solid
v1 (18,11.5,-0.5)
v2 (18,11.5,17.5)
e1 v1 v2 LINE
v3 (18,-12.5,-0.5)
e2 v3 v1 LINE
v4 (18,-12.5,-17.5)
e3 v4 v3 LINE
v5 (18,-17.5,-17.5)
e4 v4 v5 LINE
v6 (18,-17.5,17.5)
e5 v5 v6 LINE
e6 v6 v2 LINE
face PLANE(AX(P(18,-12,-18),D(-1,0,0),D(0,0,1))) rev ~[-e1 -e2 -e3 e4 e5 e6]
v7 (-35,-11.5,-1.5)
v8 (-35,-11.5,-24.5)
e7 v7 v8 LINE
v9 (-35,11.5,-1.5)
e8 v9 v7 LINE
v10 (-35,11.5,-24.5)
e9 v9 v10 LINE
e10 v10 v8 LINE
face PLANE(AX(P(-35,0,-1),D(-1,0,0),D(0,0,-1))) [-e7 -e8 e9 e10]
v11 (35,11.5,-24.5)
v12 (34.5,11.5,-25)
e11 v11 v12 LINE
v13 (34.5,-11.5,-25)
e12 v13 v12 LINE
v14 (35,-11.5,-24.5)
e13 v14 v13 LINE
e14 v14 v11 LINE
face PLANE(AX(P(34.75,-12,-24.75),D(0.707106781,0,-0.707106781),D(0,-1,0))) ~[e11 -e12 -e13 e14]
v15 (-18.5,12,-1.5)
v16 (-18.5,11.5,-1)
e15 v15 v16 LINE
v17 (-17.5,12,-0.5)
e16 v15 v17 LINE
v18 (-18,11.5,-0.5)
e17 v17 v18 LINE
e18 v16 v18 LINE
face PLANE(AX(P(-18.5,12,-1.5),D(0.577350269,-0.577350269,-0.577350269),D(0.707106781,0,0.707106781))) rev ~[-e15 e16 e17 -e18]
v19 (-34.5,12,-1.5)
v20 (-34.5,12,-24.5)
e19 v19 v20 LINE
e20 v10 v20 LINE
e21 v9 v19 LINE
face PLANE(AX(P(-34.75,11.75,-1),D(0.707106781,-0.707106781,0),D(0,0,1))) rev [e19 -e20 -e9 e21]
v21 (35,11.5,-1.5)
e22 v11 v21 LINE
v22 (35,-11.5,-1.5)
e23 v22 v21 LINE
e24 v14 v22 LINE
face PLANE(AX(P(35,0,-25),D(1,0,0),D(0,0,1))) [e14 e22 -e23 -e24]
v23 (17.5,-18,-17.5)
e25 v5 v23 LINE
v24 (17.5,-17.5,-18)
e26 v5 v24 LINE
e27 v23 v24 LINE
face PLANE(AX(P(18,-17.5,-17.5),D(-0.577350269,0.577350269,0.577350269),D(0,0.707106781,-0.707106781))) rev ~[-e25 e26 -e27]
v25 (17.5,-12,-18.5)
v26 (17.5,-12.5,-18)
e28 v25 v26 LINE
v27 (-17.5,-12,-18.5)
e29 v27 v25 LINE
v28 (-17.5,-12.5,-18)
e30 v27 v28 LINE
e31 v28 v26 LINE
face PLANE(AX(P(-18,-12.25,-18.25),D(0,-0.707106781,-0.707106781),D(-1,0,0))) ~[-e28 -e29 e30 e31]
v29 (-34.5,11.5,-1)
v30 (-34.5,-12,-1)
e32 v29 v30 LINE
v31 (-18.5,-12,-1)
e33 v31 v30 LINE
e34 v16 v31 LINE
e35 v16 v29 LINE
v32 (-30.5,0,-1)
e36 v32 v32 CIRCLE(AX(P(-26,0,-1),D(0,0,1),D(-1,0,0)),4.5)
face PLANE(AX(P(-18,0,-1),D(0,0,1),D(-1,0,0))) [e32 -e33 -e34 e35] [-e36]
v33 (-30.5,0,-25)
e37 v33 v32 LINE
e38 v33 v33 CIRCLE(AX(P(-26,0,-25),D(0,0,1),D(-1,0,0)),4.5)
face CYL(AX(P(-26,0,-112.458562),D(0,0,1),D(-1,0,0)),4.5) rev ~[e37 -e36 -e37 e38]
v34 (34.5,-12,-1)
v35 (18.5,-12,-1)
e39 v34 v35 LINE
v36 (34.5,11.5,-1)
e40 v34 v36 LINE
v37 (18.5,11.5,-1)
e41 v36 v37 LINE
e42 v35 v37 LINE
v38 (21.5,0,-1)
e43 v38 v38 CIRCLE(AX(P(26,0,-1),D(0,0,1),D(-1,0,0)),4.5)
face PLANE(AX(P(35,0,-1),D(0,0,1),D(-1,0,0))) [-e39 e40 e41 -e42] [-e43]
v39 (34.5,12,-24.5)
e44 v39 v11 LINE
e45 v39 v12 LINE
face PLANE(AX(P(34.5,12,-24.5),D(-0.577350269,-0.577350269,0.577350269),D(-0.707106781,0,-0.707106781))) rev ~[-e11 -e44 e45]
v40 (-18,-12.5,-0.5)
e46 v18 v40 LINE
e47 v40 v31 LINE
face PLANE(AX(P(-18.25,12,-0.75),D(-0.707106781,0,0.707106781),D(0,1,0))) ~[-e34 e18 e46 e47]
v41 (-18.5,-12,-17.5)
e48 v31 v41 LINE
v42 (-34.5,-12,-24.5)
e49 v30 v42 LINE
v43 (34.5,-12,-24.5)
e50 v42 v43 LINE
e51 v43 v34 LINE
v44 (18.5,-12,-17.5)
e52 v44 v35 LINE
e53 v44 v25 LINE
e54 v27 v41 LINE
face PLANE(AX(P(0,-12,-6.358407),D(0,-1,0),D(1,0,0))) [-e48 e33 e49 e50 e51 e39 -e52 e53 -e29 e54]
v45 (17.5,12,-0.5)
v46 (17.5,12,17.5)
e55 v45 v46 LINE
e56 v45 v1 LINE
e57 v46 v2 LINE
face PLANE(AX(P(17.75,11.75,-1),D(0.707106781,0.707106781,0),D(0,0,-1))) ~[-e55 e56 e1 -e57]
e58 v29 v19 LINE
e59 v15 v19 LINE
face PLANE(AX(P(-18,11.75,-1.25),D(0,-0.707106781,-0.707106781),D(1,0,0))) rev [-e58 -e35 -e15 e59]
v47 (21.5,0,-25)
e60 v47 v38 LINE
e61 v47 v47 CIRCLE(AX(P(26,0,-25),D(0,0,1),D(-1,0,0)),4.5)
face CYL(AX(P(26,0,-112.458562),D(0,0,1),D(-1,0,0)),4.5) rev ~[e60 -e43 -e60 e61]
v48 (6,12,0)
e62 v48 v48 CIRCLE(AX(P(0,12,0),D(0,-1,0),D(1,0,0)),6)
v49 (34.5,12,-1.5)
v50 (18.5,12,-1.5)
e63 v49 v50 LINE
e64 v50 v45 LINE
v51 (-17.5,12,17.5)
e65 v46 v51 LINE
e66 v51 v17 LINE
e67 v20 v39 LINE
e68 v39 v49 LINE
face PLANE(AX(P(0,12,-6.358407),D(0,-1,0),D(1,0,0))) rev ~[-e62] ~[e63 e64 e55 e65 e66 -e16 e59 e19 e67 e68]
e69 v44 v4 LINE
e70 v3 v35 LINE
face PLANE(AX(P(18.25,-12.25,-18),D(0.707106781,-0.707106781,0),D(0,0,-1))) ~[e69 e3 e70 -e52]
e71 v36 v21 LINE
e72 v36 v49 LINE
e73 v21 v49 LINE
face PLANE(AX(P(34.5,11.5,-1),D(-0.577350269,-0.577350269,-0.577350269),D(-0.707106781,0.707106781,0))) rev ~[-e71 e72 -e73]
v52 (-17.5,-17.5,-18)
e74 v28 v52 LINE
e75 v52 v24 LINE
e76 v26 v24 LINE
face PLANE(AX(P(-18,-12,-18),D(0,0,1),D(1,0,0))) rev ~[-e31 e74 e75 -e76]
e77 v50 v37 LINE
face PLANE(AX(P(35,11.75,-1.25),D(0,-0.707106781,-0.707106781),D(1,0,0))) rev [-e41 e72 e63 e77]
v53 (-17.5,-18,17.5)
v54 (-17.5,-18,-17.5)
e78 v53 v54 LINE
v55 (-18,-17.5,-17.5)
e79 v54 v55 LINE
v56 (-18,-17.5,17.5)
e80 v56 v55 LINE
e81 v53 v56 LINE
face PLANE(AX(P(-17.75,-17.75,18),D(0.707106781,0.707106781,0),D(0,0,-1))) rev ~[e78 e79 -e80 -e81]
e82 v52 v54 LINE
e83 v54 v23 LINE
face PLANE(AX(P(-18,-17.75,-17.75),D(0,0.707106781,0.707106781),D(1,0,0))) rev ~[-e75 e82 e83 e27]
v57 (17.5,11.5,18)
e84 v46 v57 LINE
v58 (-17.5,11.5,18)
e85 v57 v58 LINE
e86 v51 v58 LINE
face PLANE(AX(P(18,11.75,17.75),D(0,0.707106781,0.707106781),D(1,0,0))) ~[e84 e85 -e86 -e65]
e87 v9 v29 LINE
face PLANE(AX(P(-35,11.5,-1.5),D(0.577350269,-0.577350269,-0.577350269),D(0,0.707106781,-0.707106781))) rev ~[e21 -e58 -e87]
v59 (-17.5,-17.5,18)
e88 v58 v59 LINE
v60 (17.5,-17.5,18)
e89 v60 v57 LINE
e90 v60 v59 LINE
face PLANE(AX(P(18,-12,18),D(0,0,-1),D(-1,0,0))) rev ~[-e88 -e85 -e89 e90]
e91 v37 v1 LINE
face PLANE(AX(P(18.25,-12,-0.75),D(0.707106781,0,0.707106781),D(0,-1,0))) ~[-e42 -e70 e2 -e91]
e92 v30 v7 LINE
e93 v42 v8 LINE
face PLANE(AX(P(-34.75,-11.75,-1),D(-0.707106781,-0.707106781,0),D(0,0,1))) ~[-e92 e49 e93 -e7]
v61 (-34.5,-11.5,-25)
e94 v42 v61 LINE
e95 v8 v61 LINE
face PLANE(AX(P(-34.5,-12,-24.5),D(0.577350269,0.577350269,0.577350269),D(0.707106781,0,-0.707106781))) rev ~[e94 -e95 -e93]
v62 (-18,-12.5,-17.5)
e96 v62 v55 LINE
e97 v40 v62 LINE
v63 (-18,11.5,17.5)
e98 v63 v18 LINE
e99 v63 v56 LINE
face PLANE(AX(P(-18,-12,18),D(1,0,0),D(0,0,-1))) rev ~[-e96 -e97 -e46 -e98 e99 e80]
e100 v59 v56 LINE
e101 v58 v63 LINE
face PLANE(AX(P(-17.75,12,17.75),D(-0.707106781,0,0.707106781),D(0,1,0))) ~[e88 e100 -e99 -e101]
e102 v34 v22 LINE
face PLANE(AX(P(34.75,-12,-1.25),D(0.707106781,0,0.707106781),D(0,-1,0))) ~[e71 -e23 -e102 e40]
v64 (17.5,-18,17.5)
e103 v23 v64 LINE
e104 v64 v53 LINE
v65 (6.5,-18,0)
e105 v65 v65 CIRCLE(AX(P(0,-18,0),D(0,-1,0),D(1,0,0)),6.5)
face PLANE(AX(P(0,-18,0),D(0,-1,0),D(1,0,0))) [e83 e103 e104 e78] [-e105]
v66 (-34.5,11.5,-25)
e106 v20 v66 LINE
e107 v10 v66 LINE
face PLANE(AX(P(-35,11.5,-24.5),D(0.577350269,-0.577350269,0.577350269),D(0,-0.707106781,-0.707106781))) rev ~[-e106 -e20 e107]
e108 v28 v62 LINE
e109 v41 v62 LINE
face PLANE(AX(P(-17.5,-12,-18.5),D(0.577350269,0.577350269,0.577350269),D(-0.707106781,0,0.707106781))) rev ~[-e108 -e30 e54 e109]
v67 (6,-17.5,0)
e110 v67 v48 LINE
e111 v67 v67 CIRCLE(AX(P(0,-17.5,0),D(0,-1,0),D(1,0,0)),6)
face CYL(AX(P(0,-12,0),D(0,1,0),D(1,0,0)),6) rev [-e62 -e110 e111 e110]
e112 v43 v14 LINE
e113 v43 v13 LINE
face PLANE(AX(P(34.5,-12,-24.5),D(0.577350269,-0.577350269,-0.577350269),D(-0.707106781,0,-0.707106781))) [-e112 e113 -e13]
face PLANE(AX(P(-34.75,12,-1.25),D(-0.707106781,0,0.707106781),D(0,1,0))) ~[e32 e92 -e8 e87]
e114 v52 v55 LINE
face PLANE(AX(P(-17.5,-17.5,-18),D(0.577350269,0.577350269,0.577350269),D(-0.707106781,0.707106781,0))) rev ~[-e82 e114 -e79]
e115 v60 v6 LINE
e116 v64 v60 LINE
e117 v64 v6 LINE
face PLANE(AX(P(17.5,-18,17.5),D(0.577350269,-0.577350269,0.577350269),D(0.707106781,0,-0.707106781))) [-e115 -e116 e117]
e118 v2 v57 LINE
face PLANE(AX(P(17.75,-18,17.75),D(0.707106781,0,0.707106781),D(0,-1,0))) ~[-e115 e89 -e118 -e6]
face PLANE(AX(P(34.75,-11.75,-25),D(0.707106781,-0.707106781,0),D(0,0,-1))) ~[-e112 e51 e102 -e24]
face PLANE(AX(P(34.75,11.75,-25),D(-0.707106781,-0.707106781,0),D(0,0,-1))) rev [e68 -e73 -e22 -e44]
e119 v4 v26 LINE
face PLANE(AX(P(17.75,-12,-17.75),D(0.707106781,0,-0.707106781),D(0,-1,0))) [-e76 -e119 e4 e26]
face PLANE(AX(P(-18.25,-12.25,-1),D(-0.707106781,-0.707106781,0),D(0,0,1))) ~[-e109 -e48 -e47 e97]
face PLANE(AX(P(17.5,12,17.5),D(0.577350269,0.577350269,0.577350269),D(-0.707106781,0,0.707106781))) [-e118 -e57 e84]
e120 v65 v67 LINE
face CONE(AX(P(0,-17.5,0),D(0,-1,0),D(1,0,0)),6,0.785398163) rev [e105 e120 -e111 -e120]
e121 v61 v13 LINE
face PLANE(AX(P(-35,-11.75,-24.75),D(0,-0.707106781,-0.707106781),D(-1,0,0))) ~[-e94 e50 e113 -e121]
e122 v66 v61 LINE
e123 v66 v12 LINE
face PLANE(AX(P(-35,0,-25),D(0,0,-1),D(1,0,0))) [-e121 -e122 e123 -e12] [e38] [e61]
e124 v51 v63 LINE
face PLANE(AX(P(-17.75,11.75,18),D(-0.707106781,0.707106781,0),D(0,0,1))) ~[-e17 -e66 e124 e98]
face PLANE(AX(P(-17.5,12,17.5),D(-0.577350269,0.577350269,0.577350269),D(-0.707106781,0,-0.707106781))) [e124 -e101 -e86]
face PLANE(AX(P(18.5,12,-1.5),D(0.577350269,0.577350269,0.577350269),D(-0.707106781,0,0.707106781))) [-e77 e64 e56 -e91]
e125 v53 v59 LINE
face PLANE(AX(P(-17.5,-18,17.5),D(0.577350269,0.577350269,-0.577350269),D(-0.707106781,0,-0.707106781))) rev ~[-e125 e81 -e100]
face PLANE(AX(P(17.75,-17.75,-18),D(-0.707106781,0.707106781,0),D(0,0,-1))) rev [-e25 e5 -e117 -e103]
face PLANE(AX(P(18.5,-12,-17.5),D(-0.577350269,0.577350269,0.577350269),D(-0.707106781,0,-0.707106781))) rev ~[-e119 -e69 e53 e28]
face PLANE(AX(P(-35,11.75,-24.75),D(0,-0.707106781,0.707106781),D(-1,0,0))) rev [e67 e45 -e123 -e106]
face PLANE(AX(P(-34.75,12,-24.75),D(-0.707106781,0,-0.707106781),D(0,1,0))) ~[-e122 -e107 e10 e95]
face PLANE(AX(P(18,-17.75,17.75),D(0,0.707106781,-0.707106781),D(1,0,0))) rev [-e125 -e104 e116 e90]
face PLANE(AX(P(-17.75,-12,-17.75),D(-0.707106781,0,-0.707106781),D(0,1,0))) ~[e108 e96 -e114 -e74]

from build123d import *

# Parameters (mm, degrees)
F0_R     = 6
F1_DEPTH = 12
F2_R     = 6
F3_DEPTH = 6
F5_D     = 9
F6_SIZE  = 0.5


with BuildPart() as f1:
    # F0 (on Front) → F1 (new body, symmetric)
    with BuildSketch(Plane.XZ):
        Polygon((18, 18), (0, 18), (-18, 18), (-18, -1), (-35, -1), (-35, -25), (0, -25), (35, -25), (35, -1), (18, -1), align=None)
        Circle(F0_R, mode=Mode.SUBTRACT)
    extrude(amount=F1_DEPTH, both=True)

    # F2 (on face) → F3 (join)
    with BuildSketch(Plane.XZ.offset(12)):
        Polygon((18, 18), (-18, 18), (-18, -1), (-18, -18), (18, -18), (18, -1), align=None)
        Circle(F2_R, mode=Mode.SUBTRACT)
    extrude(amount=F3_DEPTH)

    # F5 (through all)
    with Locations(Plane(origin=(0, 0, -25), x_dir=(1, 0, 0), z_dir=(0, 0, -1))):
        with Locations((-26, 0), (26, 0)):
            Hole(F5_D / 2)

    # F6
    f6_edges = [f1.edges().sort_by_distance(p)[0] for p in [
        (18, -3, 18),
        (-18, -3, 18),
        (0, -18, 18),
        (-18, -18, 0),
        (0, -18, -18),
        (18, -18, 0),
        (-6, -18, 0),
        (35, 0, -25),
        (35, 12, -13),
        (35, 0, -1),
        (35, -12, -13),
        (26.5, 12, -1),
        (18, 12, 8.5),
        (0, 12, 18),
        (-26.5, 12, -1),
        (-18, 12, 8.5),
        (-18, 0, -1),
        (-18, -12, -9.5),
        (-18, -15, -18),
        (18, -15, -18),
        (18, -12, -9.5),
        (18, 0, -1),
        (0, 12, -25),
        (-35, 0, -1),
        (-35, 12, -13),
        (-35, 0, -25),
        (-35, -12, -13),
        (0, -12, -25),
        (0, -12, -18),
    ]]
    chamfer(f6_edges, length=F6_SIZE)


solid = f1.part
